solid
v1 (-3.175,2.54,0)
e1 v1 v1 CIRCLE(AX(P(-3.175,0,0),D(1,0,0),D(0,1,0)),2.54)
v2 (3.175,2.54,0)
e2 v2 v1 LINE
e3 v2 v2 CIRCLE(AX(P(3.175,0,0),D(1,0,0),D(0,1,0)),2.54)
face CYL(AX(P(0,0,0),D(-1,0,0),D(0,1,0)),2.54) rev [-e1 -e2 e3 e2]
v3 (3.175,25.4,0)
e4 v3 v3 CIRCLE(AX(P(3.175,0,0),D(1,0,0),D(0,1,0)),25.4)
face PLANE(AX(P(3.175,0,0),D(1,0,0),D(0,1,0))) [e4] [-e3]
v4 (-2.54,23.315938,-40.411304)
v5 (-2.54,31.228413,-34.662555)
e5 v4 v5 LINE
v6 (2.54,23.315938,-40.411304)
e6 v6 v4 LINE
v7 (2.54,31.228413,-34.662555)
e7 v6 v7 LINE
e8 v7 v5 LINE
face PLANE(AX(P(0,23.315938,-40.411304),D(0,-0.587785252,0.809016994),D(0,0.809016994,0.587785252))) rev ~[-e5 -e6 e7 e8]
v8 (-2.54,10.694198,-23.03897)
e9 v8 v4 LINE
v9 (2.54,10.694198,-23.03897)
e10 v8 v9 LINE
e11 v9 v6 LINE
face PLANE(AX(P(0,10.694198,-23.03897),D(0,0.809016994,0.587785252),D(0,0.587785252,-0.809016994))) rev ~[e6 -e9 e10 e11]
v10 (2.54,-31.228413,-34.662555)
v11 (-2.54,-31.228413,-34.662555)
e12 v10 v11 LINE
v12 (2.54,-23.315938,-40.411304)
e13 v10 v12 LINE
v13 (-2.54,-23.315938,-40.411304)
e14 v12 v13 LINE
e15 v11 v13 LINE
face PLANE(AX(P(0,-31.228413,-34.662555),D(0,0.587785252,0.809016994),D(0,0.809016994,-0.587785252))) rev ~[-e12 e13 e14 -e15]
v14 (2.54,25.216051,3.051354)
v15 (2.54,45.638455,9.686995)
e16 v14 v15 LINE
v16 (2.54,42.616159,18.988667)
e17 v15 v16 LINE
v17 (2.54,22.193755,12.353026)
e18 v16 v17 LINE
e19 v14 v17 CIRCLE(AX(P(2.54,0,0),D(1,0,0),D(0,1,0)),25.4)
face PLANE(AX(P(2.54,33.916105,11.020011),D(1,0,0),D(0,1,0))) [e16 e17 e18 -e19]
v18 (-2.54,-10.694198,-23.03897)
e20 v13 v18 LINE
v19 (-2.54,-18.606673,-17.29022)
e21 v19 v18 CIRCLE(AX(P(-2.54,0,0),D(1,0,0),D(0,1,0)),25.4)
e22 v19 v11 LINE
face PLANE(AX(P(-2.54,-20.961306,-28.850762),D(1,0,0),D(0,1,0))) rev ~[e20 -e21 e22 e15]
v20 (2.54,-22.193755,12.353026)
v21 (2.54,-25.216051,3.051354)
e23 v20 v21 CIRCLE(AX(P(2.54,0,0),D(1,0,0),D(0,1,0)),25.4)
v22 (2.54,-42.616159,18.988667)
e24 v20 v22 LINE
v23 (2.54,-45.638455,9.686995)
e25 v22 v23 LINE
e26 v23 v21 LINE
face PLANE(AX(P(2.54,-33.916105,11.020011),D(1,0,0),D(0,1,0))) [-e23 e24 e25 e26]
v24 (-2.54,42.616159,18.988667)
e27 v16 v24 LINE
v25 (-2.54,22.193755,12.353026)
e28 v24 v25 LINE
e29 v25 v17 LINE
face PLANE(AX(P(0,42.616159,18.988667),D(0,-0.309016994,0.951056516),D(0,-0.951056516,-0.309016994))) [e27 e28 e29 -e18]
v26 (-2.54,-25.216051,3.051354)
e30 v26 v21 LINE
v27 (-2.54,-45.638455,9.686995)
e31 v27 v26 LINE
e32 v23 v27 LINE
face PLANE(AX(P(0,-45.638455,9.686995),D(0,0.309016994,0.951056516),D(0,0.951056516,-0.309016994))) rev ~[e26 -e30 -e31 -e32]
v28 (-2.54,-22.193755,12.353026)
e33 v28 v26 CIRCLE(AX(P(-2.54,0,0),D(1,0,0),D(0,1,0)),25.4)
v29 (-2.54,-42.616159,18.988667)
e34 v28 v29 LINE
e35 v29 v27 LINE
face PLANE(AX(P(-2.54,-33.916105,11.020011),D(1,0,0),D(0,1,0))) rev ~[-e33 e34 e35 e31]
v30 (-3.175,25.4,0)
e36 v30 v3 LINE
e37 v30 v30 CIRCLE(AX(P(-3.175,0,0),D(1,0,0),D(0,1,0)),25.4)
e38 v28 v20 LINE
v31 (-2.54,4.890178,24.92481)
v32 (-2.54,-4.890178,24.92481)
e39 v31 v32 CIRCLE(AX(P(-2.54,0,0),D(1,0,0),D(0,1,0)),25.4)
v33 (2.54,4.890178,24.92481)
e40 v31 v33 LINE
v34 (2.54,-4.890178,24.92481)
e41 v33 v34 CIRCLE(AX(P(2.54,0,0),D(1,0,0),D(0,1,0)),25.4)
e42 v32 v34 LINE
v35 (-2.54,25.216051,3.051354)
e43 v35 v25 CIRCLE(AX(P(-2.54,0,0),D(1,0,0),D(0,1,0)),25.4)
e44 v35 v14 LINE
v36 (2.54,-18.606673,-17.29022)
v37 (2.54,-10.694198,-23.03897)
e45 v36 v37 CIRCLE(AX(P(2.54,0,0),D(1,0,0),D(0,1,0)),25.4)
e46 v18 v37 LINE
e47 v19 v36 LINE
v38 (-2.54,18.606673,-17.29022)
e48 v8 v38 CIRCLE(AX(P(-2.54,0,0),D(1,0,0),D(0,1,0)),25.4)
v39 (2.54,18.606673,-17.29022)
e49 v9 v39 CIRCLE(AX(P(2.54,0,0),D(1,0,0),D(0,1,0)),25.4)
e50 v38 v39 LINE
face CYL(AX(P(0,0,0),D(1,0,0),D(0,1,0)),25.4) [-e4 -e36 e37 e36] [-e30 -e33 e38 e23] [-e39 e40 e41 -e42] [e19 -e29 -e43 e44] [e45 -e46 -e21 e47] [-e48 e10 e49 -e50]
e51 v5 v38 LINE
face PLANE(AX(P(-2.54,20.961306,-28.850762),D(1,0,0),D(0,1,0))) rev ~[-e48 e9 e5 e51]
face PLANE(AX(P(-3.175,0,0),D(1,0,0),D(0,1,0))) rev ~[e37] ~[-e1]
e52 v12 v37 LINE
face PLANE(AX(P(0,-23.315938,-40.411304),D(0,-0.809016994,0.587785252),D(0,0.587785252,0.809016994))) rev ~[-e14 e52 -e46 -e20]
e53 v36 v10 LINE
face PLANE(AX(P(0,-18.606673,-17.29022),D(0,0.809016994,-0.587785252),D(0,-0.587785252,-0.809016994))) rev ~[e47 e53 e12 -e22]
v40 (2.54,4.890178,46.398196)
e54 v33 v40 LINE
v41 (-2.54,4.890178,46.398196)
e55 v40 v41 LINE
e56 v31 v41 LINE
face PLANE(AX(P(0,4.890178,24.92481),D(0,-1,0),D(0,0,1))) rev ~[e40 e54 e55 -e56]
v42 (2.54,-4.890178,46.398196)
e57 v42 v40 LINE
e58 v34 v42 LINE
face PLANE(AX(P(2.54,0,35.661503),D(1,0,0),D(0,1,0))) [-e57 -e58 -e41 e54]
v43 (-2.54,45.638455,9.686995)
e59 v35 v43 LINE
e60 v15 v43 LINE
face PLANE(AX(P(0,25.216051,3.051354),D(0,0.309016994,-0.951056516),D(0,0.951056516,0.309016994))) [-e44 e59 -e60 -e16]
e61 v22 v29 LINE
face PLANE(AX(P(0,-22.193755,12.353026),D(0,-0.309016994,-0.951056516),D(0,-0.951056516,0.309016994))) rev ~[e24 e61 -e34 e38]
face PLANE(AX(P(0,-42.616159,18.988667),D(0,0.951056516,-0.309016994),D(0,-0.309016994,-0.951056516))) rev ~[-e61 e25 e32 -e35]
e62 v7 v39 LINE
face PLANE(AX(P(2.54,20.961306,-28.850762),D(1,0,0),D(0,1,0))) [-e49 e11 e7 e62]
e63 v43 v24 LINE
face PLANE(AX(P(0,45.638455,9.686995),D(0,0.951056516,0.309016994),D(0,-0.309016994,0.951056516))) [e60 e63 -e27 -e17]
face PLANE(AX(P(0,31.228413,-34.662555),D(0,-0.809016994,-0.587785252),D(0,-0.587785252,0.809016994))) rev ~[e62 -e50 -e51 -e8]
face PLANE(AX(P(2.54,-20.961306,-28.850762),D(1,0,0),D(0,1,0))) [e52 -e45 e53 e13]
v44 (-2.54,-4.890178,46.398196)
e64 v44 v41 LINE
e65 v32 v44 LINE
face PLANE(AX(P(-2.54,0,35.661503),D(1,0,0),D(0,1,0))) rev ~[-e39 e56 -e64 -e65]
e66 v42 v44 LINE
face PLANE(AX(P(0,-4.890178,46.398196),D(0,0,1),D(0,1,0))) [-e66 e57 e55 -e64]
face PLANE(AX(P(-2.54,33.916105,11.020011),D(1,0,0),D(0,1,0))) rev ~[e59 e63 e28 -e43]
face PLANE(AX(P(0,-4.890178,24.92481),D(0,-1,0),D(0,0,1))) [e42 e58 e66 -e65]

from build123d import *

# Parameters (mm, degrees)
F2_R     = 25.4
F2_R_2   = 2.54
F3_DEPTH = 3.175
F4_W     = 9.7803566605
F4_H     = 21.473386322
F5_DEPTH = 2.54


# Not quite as in the source:
# - the program builds the solid bodies; features that only make, move or delete a surface that nothing else refers to are left out


with BuildPart() as f3:
    # F2 (on Right) → F3 (new body, symmetric)
    with BuildSketch(Plane.YZ):
        Circle(F2_R)
        Circle(F2_R_2, mode=Mode.SUBTRACT)
    extrude(amount=F3_DEPTH, both=True)

    # F4 (on Right) → F5 (join, symmetric)
    with BuildSketch(Plane.YZ):
        with Locations((0, 35.6615032084)):
            Rectangle(F4_W, F4_H)
        Polygon((-45.638455211, 9.6869952197), (-25.2160512226, 3.0513539194), (-22.1937548034, 12.353025853), (-42.6161587919, 18.9886671533), align=None)
        Polygon((-23.3159381842, -40.4113040748), (-10.6941983874, -23.0389696135), (-18.6066731367, -17.2902202063), (-31.2284129336, -34.6625546676), align=None)
        Polygon((31.2284129336, -34.6625546676), (18.6066731367, -17.2902202063), (10.6941983874, -23.0389696135), (23.3159381842, -40.4113040748), align=None)
        Polygon((42.6161587919, 18.9886671533), (22.1937548034, 12.353025853), (25.2160512226, 3.0513539194), (45.638455211, 9.6869952197), align=None)
    extrude(amount=F5_DEPTH, both=True)


solid = f3.part
